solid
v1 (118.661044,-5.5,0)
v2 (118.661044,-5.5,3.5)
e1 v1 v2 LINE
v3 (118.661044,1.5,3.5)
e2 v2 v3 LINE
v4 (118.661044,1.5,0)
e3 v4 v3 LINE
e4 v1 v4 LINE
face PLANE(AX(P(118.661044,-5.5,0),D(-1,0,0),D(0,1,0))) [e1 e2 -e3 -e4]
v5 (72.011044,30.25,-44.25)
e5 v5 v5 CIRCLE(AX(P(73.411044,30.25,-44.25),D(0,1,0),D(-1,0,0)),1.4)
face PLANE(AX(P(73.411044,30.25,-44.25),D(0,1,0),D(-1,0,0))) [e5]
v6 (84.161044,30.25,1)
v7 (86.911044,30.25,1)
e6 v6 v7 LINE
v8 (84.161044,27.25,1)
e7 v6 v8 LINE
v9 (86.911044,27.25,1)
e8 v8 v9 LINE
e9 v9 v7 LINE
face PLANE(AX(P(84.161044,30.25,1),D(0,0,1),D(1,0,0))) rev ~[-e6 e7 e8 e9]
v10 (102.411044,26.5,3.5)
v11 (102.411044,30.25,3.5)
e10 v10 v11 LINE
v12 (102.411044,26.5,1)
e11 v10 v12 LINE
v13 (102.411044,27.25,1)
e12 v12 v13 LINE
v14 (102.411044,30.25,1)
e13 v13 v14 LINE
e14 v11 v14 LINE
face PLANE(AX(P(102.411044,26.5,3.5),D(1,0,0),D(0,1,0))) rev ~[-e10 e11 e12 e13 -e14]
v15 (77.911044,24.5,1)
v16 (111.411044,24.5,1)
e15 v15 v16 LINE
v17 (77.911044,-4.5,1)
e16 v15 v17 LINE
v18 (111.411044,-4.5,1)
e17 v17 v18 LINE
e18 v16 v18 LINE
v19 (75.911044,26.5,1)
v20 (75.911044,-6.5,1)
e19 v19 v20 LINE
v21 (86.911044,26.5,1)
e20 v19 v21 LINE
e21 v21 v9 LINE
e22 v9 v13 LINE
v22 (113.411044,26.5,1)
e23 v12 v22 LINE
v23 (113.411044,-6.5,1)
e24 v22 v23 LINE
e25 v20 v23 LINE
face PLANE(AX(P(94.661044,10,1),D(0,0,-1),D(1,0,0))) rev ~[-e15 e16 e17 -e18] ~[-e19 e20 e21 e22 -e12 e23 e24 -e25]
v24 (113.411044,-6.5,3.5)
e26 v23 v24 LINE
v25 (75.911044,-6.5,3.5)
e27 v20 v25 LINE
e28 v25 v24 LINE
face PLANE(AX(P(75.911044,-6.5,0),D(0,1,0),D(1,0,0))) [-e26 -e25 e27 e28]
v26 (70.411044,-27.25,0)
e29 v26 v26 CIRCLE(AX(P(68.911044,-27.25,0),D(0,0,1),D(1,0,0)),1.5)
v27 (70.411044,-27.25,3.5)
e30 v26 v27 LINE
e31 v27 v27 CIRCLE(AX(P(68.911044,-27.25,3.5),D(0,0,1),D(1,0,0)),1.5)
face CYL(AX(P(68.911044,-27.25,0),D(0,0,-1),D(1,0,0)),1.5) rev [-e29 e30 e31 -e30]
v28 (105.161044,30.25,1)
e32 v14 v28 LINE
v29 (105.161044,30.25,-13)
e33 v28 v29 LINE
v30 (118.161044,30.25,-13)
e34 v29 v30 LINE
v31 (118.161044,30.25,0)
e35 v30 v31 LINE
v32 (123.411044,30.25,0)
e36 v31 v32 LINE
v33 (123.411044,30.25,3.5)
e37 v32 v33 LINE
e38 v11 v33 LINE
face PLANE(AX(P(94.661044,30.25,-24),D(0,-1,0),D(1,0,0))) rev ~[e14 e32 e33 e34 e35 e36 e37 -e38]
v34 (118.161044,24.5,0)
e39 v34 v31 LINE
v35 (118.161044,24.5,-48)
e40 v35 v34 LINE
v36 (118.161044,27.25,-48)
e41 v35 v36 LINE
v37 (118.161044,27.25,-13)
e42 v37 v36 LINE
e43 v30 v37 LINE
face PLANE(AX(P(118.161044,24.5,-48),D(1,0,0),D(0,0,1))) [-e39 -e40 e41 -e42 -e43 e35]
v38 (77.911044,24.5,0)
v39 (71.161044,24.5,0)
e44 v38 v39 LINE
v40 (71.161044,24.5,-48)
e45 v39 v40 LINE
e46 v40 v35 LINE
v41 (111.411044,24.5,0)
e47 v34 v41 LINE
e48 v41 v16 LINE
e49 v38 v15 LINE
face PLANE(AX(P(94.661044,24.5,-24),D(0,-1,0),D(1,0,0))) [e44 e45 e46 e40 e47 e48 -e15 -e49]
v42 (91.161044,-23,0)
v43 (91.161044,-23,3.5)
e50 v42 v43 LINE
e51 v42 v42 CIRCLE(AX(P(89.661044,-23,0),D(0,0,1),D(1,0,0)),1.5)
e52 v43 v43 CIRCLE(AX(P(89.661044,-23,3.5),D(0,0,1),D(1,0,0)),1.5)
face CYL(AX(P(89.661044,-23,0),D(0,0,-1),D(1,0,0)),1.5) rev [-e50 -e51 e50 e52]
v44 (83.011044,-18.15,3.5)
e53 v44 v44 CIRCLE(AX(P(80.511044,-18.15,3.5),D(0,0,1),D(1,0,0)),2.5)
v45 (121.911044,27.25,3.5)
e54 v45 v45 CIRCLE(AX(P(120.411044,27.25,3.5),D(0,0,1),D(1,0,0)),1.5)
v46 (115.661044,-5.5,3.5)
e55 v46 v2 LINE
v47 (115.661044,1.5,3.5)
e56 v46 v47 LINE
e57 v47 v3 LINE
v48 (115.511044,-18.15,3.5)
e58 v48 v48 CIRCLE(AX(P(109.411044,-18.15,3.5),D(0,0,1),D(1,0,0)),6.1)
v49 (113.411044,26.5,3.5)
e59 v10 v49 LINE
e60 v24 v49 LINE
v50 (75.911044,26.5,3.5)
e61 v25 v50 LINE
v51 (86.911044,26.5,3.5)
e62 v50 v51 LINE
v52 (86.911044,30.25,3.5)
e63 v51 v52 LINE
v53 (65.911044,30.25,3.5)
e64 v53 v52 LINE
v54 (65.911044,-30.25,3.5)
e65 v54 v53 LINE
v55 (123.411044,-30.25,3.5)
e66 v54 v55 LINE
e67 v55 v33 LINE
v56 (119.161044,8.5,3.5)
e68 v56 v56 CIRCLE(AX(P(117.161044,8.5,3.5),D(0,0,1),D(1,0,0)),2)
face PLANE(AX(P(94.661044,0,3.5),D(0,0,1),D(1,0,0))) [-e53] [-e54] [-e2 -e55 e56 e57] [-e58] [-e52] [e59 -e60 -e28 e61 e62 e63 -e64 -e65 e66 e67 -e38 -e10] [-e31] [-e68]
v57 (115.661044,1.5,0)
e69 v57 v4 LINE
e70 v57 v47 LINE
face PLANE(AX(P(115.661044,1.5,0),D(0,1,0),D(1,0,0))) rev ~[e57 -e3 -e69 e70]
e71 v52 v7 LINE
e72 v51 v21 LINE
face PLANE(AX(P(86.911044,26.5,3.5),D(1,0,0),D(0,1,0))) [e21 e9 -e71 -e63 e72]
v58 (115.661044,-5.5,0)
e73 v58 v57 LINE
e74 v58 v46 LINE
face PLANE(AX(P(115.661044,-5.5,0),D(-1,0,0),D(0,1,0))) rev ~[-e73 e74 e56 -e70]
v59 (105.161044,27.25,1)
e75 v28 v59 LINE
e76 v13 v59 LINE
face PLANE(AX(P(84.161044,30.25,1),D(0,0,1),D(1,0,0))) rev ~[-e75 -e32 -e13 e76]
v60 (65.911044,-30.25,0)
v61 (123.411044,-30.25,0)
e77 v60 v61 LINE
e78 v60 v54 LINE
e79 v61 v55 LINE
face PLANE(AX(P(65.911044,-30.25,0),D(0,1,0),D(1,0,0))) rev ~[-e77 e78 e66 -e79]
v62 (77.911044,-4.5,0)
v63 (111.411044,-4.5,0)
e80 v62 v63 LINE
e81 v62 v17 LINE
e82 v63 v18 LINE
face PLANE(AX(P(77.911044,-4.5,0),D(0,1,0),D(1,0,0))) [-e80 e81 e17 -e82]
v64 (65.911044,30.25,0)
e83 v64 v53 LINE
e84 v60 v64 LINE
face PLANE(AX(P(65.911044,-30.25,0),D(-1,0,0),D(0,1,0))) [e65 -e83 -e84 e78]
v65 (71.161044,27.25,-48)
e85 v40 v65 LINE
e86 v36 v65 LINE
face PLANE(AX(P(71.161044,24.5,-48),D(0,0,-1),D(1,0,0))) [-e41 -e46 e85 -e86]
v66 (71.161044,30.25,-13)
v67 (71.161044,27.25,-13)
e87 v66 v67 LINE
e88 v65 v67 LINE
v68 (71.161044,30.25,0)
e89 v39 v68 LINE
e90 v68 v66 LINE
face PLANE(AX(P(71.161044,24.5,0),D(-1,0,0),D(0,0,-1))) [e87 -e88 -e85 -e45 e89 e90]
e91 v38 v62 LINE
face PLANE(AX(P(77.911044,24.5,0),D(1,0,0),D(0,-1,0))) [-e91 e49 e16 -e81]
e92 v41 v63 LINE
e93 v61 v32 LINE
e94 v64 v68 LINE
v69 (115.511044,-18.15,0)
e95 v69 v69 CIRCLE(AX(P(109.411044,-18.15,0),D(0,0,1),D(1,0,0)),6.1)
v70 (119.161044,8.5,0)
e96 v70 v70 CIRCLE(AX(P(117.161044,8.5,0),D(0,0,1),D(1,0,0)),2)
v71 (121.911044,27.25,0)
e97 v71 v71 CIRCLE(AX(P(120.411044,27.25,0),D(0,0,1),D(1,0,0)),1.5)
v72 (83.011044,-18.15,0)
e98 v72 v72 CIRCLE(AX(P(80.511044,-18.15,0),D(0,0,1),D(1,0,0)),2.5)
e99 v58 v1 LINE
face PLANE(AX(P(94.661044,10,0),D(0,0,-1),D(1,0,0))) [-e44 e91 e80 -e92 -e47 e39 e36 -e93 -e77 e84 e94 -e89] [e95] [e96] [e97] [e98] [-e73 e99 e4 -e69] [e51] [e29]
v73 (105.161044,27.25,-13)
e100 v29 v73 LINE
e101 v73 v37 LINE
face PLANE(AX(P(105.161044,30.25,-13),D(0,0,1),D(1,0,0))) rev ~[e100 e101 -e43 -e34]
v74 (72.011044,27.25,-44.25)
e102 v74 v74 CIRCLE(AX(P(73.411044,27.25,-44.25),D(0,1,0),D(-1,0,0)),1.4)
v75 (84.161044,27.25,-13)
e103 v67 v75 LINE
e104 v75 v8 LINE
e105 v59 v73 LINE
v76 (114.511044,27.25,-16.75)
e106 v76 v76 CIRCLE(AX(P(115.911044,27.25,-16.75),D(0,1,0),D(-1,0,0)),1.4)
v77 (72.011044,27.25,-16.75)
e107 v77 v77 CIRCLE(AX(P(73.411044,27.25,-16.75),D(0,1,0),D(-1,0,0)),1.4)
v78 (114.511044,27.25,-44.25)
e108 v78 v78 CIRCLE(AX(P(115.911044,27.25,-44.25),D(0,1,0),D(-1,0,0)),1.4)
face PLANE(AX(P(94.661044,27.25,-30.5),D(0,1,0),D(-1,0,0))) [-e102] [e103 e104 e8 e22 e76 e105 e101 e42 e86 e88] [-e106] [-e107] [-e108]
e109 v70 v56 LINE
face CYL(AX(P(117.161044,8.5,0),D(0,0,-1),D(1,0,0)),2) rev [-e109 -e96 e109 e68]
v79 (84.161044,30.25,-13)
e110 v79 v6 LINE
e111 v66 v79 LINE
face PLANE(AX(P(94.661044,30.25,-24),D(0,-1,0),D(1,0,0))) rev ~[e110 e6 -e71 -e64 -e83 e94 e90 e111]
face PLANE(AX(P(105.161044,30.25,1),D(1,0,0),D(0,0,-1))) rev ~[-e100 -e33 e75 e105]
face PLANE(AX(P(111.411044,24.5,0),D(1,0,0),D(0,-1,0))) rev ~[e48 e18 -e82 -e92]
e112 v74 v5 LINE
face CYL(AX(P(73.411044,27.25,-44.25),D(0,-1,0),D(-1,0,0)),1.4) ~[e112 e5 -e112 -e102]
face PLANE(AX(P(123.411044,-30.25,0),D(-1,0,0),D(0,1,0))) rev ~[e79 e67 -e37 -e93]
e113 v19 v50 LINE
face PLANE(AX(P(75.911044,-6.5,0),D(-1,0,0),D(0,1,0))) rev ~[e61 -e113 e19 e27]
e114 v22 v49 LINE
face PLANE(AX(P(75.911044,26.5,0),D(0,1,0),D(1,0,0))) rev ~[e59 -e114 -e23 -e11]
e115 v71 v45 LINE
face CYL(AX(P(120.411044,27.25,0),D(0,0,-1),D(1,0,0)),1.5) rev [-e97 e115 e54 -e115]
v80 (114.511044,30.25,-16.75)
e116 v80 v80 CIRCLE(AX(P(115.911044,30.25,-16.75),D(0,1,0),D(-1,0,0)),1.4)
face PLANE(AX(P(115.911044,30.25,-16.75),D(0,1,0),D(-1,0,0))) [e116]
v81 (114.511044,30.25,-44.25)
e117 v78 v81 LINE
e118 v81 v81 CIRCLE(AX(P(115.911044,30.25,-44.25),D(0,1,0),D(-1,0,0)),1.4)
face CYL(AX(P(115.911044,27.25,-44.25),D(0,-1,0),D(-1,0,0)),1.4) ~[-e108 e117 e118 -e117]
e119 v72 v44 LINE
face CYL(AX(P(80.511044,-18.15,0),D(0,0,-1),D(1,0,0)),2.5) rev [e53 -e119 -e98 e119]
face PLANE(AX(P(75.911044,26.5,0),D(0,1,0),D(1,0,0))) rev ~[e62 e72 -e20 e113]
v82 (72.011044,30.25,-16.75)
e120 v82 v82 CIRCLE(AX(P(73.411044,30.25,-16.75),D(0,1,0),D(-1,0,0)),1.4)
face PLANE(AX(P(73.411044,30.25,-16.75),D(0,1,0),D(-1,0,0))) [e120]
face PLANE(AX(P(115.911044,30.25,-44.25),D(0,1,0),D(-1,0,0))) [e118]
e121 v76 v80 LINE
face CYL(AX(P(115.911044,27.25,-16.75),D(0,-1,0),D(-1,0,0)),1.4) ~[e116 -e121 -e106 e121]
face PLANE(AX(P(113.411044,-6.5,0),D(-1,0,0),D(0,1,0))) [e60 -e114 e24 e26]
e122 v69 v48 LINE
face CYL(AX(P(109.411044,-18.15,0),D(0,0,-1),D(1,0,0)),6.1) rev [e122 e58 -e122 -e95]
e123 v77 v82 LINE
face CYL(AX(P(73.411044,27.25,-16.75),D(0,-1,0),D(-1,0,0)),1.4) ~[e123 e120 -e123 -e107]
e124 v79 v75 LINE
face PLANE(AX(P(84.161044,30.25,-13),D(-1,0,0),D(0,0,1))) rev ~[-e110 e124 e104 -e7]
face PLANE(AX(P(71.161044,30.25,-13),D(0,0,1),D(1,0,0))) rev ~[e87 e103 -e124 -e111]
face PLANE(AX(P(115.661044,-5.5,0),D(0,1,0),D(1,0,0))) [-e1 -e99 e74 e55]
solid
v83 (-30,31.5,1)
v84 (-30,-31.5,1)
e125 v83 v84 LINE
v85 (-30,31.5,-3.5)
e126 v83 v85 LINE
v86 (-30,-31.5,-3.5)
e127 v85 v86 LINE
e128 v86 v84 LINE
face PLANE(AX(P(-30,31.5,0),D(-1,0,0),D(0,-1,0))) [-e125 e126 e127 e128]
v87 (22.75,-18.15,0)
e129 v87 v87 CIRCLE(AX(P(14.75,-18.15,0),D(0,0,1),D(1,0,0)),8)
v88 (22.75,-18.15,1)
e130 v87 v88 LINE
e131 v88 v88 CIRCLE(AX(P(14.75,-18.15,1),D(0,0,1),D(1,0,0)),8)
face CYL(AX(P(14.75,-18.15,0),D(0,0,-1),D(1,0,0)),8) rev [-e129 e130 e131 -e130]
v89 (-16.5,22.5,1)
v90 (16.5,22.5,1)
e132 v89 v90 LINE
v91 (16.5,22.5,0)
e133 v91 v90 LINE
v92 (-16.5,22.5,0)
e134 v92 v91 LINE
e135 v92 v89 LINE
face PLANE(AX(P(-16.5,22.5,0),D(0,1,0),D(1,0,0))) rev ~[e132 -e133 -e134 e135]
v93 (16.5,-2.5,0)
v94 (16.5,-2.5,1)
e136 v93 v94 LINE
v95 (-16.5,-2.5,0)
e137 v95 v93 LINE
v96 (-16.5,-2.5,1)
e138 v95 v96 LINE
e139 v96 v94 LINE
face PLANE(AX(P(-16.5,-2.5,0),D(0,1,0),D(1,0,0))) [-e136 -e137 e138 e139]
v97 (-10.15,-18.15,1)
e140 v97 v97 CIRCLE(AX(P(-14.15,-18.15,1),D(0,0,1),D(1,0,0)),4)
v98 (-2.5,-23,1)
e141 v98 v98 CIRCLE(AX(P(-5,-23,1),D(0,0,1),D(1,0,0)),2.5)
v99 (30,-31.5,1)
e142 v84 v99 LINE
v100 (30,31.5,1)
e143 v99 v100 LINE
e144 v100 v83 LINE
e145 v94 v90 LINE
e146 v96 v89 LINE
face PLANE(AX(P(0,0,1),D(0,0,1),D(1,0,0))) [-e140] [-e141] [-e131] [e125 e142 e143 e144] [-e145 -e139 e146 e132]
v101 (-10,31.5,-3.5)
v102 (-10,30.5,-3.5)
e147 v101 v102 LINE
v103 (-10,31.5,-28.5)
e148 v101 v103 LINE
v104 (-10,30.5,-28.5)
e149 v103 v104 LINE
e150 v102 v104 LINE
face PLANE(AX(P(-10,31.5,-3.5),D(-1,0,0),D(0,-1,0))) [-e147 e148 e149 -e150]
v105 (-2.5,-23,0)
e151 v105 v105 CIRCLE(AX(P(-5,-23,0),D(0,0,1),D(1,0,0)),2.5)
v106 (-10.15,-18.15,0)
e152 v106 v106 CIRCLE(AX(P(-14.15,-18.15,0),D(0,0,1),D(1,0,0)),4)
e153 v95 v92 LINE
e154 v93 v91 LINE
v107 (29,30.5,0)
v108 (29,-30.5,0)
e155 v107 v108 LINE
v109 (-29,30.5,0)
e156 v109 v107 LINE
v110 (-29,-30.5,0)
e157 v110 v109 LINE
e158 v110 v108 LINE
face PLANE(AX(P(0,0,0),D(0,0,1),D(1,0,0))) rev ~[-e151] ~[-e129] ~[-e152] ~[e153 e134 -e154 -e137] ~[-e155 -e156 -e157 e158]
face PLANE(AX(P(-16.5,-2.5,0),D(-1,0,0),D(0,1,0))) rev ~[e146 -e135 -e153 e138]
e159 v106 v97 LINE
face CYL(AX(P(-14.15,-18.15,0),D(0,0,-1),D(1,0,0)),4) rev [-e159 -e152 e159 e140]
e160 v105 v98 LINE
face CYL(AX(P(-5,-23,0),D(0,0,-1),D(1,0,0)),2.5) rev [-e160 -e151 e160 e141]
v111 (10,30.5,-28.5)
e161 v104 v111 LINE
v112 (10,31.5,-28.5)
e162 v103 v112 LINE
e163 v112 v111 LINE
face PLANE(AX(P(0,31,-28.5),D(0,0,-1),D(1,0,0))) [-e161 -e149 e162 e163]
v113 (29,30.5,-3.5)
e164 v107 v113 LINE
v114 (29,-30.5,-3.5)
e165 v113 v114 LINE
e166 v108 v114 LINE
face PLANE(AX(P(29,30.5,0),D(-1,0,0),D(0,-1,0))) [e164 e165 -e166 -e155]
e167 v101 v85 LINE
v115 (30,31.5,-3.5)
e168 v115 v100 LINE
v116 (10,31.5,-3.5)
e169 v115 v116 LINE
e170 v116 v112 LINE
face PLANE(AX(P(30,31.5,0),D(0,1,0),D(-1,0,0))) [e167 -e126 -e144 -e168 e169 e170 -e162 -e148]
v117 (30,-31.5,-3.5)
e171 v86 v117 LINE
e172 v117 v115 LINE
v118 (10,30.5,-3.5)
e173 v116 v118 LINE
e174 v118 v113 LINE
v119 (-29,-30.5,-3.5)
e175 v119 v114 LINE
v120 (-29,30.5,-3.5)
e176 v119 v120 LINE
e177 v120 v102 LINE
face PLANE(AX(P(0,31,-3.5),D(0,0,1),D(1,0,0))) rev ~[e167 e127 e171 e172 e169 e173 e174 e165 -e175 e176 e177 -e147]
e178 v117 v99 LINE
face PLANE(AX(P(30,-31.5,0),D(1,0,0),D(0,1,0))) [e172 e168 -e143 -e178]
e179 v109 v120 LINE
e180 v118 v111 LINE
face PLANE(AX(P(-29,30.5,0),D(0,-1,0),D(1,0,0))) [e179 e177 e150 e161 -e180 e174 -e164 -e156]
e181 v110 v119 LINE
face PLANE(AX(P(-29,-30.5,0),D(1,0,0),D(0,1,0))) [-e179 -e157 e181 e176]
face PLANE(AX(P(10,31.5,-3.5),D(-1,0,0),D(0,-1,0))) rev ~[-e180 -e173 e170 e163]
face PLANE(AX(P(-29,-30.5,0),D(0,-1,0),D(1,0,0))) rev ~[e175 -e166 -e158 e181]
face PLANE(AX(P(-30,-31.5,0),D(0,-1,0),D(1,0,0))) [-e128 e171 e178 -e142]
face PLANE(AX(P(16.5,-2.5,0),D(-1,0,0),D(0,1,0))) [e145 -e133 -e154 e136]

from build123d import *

# Parameters (mm, degrees)
F1_W      = 57.5
F1_H      = 60.5
F1_R      = 1.5
F1_R_2    = 2.5
F1_R_3    = 6.1
F1_W_2    = 3
F1_H_2    = 7
F1_W_3    = 37.5
F1_H_3    = 33
F1_R_4    = 2
F2_DEPTH  = 3.5
F4_W      = 37.5
F4_H      = 33
F4_W_2    = 33.5
F4_H_2    = 29
F5_DEPTH  = 1
F3_W      = 15.5
F3_H      = 3.75
F6_DEPTH  = 2.5
F8_DEPTH  = 5.75
F10_DEPTH = 3
F11_R     = 1.4
F12_DEPTH = 3
F0_W      = 58
F0_H      = 61
F0_R      = 4
F0_R_2    = 2.5
F0_R_3    = 8
F0_W_2    = 33
F0_H_2    = 25
F0_H_3    = 1
F13_DEPTH = 1
F14_DEPTH = 3.5
F15_W     = 20
F15_H     = 1
F16_DEPTH = 25


with BuildPart() as f2:
    # F1 (on Top) → F2 (new body)
    with BuildSketch(Plane.XY):
        with Locations((94.6610440163, 0)):
            Rectangle(F1_W, F1_H)
        with Locations((68.9110440163, -27.25)):
            Circle(F1_R, mode=Mode.SUBTRACT)
        with Locations((89.6610440163, -23)):
            Circle(F1_R, mode=Mode.SUBTRACT)
        with Locations((80.5110440163, -18.15)):
            Circle(F1_R_2, mode=Mode.SUBTRACT)
        with Locations((109.4110440163, -18.15)):
            Circle(F1_R_3, mode=Mode.SUBTRACT)
        with Locations((117.1610440163, -2)):
            Rectangle(F1_W_2, F1_H_2, mode=Mode.SUBTRACT)
        with Locations((94.6610440163, 10)):
            Rectangle(F1_W_3, F1_H_3, mode=Mode.SUBTRACT)
        with Locations((117.1610440163, 8.5)):
            Circle(F1_R_4, mode=Mode.SUBTRACT)
        with Locations((120.4110440163, 27.25)):
            Circle(F1_R, mode=Mode.SUBTRACT)
    extrude(amount=F2_DEPTH)

    # F4 (on face) → F5 (join)
    with BuildSketch(Plane(origin=(0, 0, 0), x_dir=(1, 0, 0), z_dir=(0, 0, -1))):
        with Locations((94.6610440163, -10)):
            Rectangle(F4_W, F4_H)
        with Locations((94.6610440163, -10)):
            Rectangle(F4_W_2, F4_H_2, mode=Mode.SUBTRACT)
    extrude(amount=-F5_DEPTH)

    # F3 (on face) → F6 (cut)
    with BuildSketch(Plane.XY.offset(3.5)):
        with Locations((94.6610440163, 28.375)):
            Rectangle(F3_W, F3_H)
    extrude(amount=-F6_DEPTH, mode=Mode.SUBTRACT)

    # F7 (on face) → F8 (join)
    with BuildSketch(Plane.XZ.offset(-24.5)):
        Polygon((77.9110440163, 0), (71.1610440163, 0), (71.1610440163, -48), (118.1610440163, -48), (118.1610440163, 0), (111.4110440163, 0), align=None)
    extrude(amount=-F8_DEPTH)

    # F9 (on face) → F10 (cut)
    with BuildSketch(Plane(origin=(0, 30.25, 0), x_dir=(-1, 0, 0), z_dir=(0, 1, 0))):
        Polygon((-105.1610440163, -13), (-118.1610440163, -13), (-118.1610440163, -48), (-71.1610440163, -48), (-71.1610440163, -13), (-84.1610440163, -13), (-86.9110440163, -13), align=None)
        Polygon((-105.1610440163, 1), (-105.1610440163, -13), (-86.9110440163, -13), (-84.1610440163, -13), (-84.1610440163, 1), (-86.9110440163, 1), (-102.4110440163, 1), align=None)
    extrude(amount=-F10_DEPTH, mode=Mode.SUBTRACT)

    # F11 (on face) → F12 (join)
    with BuildSketch(Plane(origin=(0, 27.25, 0), x_dir=(-1, 0, 0), z_dir=(0, 1, 0))):
        with Locations((-115.9110440163, -16.75)):
            Circle(F11_R)
        with Locations((-115.9110440163, -44.25)):
            Circle(F11_R)
        with Locations((-73.4110440163, -16.75)):
            Circle(F11_R)
        with Locations((-73.4110440163, -44.25)):
            Circle(F11_R)
    extrude(amount=F12_DEPTH)


with BuildPart() as f13:
    # F0 (on Top) → F13 (new body)
    with BuildSketch(Plane.XY):
        Rectangle(F0_W, F0_H)
        with Locations((-14.15, -18.15)):
            Circle(F0_R, mode=Mode.SUBTRACT)
        with Locations((-5, -23)):
            Circle(F0_R_2, mode=Mode.SUBTRACT)
        with Locations((14.75, -18.15)):
            Circle(F0_R_3, mode=Mode.SUBTRACT)
        with Locations((0, 10)):
            Rectangle(F0_W_2, F0_H_2, mode=Mode.SUBTRACT)
        Polygon((-29, -31.5), (-29, -30.5), (-29, 30.5), (-29, 31.5), (-30, 31.5), (-30, -31.5), align=None)
        with Locations((0, 31)):
            Rectangle(F0_W, F0_H_3)
        Polygon((29, 30.5), (29, -30.5), (29, -31.5), (30, -31.5), (30, 31.5), (29, 31.5), align=None)
        with Locations((0, -31)):
            Rectangle(F0_W, F0_H_3)
    extrude(amount=F13_DEPTH)

    # F0 (on Top) → F14 (join)
    with BuildSketch(Plane.XY):
        with Locations((0, 31)):
            Rectangle(F0_W, F0_H_3)
        Polygon((-29, -31.5), (-29, -30.5), (-29, 30.5), (-29, 31.5), (-30, 31.5), (-30, -31.5), align=None)
        with Locations((0, -31)):
            Rectangle(F0_W, F0_H_3)
        Polygon((29, 30.5), (29, -30.5), (29, -31.5), (30, -31.5), (30, 31.5), (29, 31.5), align=None)
    extrude(amount=-F14_DEPTH)

    # F15 (on face) → F16 (join)
    with BuildSketch(Plane(origin=(0, 0, -3.5), x_dir=(1, 0, 0), z_dir=(0, 0, -1))):
        with Locations((0, -31)):
            Rectangle(F15_W, F15_H)
    extrude(amount=F16_DEPTH)


solid = Compound([f2.part, f13.part])
